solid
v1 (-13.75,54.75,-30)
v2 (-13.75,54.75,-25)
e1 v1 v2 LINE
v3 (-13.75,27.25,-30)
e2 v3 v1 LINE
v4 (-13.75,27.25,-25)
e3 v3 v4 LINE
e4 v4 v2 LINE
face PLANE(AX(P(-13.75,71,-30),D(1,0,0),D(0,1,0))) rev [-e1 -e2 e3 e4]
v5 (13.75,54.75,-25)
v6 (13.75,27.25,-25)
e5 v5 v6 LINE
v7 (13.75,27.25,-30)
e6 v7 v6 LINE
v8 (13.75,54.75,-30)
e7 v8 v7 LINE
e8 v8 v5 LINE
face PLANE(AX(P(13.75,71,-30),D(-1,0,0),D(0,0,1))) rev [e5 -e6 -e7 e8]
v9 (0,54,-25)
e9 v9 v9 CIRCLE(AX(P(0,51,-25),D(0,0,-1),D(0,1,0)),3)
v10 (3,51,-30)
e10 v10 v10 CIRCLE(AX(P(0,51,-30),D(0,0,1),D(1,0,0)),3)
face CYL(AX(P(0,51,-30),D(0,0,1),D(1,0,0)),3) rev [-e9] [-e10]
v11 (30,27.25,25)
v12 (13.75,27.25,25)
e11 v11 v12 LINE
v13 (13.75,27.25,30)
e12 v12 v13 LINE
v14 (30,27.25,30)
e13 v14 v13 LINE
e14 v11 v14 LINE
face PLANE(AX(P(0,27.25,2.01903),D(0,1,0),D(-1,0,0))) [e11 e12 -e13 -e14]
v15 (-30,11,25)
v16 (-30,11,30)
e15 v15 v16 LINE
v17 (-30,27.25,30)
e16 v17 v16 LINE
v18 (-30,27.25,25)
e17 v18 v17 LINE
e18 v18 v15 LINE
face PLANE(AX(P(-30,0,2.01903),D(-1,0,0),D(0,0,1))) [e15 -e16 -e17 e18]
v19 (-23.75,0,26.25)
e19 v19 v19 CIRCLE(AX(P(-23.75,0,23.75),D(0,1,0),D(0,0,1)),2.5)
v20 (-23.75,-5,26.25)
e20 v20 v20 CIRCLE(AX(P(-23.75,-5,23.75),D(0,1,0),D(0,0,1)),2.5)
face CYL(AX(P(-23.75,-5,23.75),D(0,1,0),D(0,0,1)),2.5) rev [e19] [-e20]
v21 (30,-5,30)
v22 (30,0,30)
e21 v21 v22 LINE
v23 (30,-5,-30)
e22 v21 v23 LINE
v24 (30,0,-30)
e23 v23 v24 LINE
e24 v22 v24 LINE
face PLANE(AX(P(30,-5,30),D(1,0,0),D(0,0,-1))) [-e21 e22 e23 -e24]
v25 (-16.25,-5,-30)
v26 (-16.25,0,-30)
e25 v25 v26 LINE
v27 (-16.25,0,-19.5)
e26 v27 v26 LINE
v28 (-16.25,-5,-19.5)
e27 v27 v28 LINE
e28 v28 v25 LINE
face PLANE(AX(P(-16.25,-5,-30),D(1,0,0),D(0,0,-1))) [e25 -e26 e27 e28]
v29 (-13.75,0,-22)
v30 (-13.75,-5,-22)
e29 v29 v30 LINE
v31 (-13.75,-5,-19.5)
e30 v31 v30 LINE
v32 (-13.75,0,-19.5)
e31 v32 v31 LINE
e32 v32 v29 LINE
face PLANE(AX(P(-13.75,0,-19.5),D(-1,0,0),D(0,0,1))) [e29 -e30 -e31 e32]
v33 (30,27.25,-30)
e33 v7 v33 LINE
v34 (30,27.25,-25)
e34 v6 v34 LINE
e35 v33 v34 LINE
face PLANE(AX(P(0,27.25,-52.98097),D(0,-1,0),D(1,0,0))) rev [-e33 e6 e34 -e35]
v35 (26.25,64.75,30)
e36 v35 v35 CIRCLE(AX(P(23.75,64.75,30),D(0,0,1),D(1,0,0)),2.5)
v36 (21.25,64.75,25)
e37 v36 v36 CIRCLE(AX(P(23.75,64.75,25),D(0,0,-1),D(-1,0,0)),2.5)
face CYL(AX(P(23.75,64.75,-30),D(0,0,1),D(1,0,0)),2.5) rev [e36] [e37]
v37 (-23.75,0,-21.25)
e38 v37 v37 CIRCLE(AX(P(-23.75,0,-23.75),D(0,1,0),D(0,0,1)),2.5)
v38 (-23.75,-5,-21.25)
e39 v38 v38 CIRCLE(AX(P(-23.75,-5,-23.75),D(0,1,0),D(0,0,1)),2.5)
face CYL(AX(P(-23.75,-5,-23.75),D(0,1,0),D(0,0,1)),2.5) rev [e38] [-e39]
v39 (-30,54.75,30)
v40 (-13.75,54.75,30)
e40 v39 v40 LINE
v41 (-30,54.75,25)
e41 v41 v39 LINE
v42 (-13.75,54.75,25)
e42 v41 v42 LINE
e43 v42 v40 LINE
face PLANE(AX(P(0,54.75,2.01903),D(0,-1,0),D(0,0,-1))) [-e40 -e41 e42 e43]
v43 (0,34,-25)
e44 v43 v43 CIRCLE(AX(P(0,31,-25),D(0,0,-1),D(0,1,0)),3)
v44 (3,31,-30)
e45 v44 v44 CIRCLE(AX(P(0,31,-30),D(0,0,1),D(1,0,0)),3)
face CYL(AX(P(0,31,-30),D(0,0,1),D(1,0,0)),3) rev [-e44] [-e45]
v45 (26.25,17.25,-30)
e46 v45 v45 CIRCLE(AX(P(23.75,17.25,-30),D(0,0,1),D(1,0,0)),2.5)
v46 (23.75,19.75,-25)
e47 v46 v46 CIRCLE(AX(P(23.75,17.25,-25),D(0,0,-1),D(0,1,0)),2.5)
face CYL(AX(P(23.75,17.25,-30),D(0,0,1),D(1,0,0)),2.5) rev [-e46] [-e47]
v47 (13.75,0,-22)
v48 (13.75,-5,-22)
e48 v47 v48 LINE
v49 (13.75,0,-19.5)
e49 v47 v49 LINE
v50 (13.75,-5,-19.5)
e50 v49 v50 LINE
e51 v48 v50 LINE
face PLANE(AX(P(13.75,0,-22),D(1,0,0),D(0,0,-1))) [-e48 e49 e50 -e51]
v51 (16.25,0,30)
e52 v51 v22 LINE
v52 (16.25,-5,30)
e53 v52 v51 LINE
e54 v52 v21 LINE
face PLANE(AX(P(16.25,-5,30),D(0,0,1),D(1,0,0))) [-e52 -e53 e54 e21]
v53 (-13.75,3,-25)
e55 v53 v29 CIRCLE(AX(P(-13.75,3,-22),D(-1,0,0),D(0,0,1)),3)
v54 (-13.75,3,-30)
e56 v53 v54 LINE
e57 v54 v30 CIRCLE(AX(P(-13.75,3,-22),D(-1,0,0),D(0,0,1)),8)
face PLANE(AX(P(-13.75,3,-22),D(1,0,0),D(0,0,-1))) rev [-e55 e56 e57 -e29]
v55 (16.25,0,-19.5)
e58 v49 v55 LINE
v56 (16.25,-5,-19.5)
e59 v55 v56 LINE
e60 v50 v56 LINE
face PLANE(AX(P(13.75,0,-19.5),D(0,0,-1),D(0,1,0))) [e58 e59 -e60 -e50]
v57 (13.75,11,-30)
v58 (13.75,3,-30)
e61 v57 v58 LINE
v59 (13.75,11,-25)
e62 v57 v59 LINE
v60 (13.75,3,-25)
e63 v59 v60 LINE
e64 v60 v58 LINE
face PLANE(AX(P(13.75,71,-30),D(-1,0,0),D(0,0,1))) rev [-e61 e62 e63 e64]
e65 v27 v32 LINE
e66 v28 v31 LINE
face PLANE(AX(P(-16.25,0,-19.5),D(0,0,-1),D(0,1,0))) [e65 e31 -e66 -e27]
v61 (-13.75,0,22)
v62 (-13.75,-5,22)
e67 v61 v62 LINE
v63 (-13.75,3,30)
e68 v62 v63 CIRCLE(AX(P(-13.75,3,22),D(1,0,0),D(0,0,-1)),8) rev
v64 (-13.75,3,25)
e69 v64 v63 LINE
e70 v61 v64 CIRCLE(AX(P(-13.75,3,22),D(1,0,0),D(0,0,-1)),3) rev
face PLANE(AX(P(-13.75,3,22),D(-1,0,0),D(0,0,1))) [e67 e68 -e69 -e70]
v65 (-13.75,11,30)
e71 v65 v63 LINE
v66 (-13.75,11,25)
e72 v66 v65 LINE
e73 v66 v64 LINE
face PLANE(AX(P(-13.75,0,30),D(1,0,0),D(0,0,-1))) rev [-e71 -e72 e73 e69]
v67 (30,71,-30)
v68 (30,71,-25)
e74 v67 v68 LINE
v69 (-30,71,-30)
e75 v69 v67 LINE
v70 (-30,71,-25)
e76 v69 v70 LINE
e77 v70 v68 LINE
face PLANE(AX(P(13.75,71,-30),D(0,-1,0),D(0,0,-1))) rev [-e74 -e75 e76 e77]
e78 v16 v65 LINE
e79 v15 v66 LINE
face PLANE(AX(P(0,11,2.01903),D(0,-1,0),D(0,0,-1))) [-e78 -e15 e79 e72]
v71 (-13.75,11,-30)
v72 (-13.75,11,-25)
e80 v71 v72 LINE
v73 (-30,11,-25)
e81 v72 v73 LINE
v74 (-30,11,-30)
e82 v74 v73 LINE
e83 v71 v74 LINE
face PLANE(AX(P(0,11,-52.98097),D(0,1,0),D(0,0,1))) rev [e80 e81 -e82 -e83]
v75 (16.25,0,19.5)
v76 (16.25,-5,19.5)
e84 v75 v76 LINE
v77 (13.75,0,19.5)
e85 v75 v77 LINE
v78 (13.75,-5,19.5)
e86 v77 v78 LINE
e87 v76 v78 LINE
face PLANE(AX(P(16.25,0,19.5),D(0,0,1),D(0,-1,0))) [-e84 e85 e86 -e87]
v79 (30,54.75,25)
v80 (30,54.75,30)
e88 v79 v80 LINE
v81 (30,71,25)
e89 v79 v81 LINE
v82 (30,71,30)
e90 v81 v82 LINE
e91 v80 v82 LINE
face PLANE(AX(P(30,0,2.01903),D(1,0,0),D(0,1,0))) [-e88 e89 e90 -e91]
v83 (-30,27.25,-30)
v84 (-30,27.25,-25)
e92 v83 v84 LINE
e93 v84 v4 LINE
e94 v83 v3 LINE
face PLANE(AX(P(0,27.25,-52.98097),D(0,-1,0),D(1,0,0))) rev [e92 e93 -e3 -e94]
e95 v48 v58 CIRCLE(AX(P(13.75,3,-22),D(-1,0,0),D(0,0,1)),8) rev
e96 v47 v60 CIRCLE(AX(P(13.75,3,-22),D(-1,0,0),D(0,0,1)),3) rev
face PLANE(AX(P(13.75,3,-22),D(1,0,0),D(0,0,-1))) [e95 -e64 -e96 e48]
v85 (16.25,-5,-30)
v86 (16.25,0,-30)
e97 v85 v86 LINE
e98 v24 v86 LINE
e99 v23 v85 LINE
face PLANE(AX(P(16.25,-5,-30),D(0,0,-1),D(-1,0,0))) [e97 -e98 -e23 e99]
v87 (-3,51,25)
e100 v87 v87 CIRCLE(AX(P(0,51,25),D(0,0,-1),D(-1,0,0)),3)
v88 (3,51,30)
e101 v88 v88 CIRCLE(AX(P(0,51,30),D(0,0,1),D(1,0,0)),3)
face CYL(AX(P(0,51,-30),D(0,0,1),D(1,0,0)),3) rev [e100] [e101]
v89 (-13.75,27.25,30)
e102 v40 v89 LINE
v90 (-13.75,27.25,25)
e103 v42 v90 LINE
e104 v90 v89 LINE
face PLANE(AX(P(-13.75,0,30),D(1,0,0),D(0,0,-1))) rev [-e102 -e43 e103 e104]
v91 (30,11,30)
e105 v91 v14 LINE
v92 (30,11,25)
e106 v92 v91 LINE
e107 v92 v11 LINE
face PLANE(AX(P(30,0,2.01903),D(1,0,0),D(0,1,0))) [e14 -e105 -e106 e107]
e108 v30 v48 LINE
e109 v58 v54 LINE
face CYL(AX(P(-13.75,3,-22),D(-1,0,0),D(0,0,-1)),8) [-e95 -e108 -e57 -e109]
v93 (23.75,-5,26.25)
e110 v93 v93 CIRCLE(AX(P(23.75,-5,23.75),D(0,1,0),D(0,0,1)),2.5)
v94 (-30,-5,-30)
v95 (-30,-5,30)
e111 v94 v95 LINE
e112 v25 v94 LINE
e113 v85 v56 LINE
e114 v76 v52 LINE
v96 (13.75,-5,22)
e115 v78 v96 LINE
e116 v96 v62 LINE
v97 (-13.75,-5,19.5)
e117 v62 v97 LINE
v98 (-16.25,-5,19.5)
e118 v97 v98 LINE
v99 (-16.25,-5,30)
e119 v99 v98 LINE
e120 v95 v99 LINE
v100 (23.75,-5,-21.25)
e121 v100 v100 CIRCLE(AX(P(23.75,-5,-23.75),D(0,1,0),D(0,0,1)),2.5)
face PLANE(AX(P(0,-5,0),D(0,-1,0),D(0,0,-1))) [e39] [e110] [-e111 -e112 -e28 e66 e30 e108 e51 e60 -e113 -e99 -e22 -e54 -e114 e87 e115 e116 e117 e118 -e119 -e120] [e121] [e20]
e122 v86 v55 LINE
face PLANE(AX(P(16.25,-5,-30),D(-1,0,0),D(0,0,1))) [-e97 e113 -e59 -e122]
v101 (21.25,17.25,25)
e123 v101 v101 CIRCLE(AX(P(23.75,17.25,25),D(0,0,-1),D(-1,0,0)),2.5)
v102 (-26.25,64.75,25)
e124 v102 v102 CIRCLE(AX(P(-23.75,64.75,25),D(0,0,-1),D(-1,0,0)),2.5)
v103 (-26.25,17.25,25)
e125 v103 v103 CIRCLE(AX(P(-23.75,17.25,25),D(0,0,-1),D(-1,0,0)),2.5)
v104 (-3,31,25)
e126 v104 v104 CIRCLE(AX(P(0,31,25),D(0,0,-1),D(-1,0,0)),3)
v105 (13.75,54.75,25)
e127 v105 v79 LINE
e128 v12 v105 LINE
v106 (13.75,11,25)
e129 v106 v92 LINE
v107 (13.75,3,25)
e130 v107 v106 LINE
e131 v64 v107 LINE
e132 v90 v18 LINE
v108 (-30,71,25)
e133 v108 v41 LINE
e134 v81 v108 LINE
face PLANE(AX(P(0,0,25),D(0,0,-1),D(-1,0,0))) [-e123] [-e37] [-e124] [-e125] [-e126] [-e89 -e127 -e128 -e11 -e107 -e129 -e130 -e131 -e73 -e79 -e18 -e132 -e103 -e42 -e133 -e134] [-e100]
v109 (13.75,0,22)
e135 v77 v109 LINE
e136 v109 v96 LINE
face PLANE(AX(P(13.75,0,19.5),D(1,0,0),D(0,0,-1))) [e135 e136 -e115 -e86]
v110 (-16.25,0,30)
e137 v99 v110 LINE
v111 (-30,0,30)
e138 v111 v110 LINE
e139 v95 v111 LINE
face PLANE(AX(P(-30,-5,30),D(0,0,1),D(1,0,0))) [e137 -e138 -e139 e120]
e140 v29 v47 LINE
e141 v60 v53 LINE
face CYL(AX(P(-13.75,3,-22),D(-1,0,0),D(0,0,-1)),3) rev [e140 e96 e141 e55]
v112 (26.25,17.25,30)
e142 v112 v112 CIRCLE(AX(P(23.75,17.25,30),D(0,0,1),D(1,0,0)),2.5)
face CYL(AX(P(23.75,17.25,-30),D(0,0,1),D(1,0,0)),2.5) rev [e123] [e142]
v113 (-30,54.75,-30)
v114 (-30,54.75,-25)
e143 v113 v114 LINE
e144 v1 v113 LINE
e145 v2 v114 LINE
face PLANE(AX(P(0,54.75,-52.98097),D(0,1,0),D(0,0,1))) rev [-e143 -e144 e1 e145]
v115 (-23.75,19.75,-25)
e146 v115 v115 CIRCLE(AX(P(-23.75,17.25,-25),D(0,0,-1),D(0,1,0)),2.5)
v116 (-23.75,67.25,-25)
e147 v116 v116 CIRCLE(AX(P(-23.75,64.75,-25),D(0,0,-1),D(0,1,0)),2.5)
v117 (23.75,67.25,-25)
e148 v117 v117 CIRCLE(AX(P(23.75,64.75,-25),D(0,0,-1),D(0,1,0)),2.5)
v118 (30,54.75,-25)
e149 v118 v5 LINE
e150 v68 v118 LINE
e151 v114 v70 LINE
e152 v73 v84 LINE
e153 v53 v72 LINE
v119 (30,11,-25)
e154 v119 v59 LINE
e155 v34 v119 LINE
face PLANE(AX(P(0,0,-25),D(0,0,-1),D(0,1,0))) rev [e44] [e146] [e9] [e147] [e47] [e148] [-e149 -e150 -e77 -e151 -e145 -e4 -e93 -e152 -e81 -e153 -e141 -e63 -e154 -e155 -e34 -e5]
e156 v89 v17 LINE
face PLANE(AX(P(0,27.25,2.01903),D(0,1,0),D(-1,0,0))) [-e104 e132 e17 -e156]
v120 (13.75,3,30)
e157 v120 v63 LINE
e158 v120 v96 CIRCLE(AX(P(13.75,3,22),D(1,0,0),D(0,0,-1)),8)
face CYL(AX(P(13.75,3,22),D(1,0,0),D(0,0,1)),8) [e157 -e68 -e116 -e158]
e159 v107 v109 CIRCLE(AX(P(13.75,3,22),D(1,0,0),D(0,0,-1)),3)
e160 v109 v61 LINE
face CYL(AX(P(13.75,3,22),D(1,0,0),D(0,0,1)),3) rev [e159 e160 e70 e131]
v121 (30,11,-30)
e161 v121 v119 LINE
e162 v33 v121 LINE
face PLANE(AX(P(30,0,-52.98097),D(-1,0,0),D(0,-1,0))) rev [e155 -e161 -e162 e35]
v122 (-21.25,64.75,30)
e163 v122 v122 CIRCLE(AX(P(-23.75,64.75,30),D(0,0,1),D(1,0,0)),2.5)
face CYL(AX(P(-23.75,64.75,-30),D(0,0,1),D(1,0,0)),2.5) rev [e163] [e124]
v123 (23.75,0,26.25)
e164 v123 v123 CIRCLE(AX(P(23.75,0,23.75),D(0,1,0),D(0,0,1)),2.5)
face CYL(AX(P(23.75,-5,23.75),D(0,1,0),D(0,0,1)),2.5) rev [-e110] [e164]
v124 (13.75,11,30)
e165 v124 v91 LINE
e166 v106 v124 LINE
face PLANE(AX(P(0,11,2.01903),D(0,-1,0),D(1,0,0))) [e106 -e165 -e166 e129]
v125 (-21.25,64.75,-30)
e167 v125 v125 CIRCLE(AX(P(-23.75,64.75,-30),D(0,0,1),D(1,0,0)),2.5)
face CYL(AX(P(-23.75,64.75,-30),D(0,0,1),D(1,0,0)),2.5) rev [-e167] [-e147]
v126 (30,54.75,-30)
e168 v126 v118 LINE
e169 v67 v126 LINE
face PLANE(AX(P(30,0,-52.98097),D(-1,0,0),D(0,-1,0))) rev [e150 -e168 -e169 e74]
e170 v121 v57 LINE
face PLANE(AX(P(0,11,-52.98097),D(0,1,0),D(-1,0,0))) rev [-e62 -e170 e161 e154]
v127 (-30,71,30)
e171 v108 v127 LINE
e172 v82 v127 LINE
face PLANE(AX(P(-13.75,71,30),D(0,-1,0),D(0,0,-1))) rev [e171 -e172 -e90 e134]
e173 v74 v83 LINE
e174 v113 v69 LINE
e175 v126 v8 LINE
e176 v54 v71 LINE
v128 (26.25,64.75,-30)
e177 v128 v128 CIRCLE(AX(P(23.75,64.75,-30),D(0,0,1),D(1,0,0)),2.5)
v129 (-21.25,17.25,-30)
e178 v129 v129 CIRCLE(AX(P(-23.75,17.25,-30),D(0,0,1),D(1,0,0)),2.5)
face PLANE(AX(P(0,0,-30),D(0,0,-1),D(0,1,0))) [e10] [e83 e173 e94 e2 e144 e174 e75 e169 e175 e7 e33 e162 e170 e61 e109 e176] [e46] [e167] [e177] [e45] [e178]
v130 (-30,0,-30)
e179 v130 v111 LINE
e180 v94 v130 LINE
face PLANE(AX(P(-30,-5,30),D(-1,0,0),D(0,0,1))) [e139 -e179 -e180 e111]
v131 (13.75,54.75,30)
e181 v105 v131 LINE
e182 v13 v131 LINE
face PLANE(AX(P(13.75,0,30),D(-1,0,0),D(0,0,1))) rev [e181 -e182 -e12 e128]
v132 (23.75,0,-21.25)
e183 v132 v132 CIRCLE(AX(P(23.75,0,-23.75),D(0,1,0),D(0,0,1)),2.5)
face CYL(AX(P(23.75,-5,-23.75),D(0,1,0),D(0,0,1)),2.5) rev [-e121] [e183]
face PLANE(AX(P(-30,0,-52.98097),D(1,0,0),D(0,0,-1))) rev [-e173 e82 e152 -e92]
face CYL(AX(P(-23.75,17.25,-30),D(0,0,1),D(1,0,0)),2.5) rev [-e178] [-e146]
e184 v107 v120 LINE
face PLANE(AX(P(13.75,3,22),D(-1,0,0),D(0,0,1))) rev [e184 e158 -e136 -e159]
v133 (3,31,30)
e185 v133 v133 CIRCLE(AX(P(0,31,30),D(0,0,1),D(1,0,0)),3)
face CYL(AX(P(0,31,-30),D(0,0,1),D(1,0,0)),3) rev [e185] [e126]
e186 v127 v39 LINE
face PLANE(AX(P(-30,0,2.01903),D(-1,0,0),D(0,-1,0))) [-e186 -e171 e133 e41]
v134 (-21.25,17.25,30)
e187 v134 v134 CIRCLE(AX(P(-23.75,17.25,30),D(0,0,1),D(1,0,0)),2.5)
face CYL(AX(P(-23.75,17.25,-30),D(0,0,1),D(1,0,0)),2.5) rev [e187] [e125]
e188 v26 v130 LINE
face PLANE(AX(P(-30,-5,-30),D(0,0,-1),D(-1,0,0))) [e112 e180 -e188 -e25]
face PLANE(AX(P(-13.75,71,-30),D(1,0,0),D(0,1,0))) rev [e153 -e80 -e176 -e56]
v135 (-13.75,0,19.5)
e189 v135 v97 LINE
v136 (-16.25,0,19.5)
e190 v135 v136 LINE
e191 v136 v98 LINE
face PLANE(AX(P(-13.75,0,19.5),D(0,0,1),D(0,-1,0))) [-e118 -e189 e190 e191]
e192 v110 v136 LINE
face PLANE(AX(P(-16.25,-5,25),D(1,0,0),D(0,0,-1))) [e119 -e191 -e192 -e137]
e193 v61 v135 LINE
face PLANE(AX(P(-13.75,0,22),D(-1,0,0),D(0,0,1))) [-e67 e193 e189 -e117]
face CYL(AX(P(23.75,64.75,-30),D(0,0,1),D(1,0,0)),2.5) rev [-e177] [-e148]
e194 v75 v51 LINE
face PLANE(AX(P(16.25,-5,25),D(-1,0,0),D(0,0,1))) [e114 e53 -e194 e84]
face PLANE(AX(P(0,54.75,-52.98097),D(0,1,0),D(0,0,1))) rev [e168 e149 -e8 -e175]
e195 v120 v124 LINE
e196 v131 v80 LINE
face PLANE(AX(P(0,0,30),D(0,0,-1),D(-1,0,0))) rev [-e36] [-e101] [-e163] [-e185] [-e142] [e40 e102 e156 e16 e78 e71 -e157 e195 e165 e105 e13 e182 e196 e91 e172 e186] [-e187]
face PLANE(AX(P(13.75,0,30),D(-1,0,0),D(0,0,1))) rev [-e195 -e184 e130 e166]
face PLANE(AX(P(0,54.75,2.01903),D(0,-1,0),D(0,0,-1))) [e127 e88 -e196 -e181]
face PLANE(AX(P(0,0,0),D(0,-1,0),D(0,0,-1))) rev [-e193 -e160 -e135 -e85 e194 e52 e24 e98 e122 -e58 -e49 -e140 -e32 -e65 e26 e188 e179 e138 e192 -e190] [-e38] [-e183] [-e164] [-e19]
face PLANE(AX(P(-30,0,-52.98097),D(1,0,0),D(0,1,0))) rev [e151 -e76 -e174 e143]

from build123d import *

# Parameters (mm, degrees)
SKETCH_16_R                       = 2.5
SM_BASE_FLANGE_2_DEPTH            = 5
SM_EDGE_FLANGE_1_STRIP_W          = 26
SM_EDGE_FLANGE_1_STRIP_H          = 5
SM_EDGE_FLANGE_1_STRIP_CUT_DEPTH  = 27.5
SM_EDGE_FLANGE_1_RELIEF_W         = 28.5
SM_EDGE_FLANGE_1_RELIEF_H         = 2.5
SM_EDGE_FLANGE_1_RELIEF_CUT_DEPTH = 5
SM_EDGE_FLANGE_1_DEPTH            = 27.5
SM_EDGE_FLANGE_2_STRIP_W          = 26
SM_EDGE_FLANGE_2_STRIP_H          = 5
SM_EDGE_FLANGE_2_STRIP_CUT_DEPTH  = 27.5
SM_EDGE_FLANGE_2_RELIEF_W         = 28.5
SM_EDGE_FLANGE_2_RELIEF_H         = 2.5
SM_EDGE_FLANGE_2_RELIEF_CUT_DEPTH = 5
SM_EDGE_FLANGE_2_DEPTH            = 27.5
EXTRUDE_START                     = 30
SKETCH_23_W                       = 16.25
SKETCH_23_H                       = 16.25
EXTRUDE_1_DEPTH                   = 5
EXTRUDE_START_2                   = -25
SKETCH_24_W                       = 16.25
SKETCH_24_H                       = 16.25
EXTRUDE_2_DEPTH                   = 5
CUT_EXTRUDE_1_DEPTH               = 83.710337927
CUT_EXTRUDE_1_DEPTH_BACK          = 83.710337927
SKETCH_25_R                       = 2.5
CUT_EXTRUDE_2_DEPTH               = 83.710337927
CUT_EXTRUDE_2_DEPTH_BACK          = 83.710337927
SKETCH_26_R                       = 3


# Sheet-metal steps are written as plain solids
with BuildPart() as part:
    # 草图16 → 基体-法兰2 (new body)
    with BuildSketch(Plane(origin=(0, 0, 0), x_dir=(1, 0, 0), z_dir=(0, 1, 0))):
        Polygon((16.25, 30), (30, 30), (30, -30), (16.25, -30), (16.25, -25), (-16.25, -25), (-16.25, -30), (-30, -30), (-30, 30), (-16.25, 30), (-16.25, 25), (16.25, 25), align=None)
        with Locations(Location((-23.75, 23.75, 0), (0, 0, 270))):
            Circle(SKETCH_16_R, mode=Mode.SUBTRACT)
        with Locations(Location((-23.75, -23.75, 0), (0, 0, 270))):
            Circle(SKETCH_16_R, mode=Mode.SUBTRACT)
        with Locations(Location((23.75, 23.75, 0), (0, 0, 270))):
            Circle(SKETCH_16_R, mode=Mode.SUBTRACT)
        with Locations(Location((23.75, -23.75, 0), (0, 0, 270))):
            Circle(SKETCH_16_R, mode=Mode.SUBTRACT)
    extrude(amount=-SM_BASE_FLANGE_2_DEPTH)

    # 边线-法兰1 strip (across the edge) → 边线-法兰1 strip cut (cut)
    with BuildSketch(Plane(origin=(-13.75, 0, 25), x_dir=(0, 0, -1), z_dir=(1, 0, 0))):
        with Locations((-10, -2.5)):
            Rectangle(SM_EDGE_FLANGE_1_STRIP_W, SM_EDGE_FLANGE_1_STRIP_H)
    extrude(amount=SM_EDGE_FLANGE_1_STRIP_CUT_DEPTH, mode=Mode.SUBTRACT)

    # 边线-法兰1 relief (on the sheet) → 边线-法兰1 relief cut (cut)
    with BuildSketch(Plane(origin=(-13.75, 0, 22), x_dir=(0, 0, -1), z_dir=(0, 1, 0))):
        with Locations((-11.75, 1.25)):
            Rectangle(SM_EDGE_FLANGE_1_RELIEF_W, SM_EDGE_FLANGE_1_RELIEF_H)
        with Locations((-11.75, -28.75)):
            Rectangle(SM_EDGE_FLANGE_1_RELIEF_W, SM_EDGE_FLANGE_1_RELIEF_H)
    extrude(amount=-SM_EDGE_FLANGE_1_RELIEF_CUT_DEPTH, mode=Mode.SUBTRACT)

    # 边线-法兰1 section (across the edge) → 边线-法兰1 (add)
    with BuildSketch(Plane(origin=(-13.75, 0, 25), x_dir=(0, 0, -1), z_dir=(1, 0, 0))):
        with BuildLine():
            Line((-5, 3), (-5, 71))
            Line((-5, 71), (0, 71))
            Line((0, 71), (0, 3))
            ThreePointArc((0, 3), (0.878679656, 0.878679656), (3, 0))
            Line((3, 0), (3, -5))
            ThreePointArc((3, -5), (-2.656854249, -2.656854249), (-5, 3))
        make_face()
    extrude(amount=SM_EDGE_FLANGE_1_DEPTH)

    # 边线-法兰2 strip (across the edge) → 边线-法兰2 strip cut (cut)
    with BuildSketch(Plane(origin=(13.75, 0, -25), x_dir=(0, 0, 1), z_dir=(-1, 0, 0))):
        with Locations((-10, -2.5)):
            Rectangle(SM_EDGE_FLANGE_2_STRIP_W, SM_EDGE_FLANGE_2_STRIP_H)
    extrude(amount=SM_EDGE_FLANGE_2_STRIP_CUT_DEPTH, mode=Mode.SUBTRACT)

    # 边线-法兰2 relief (on the sheet) → 边线-法兰2 relief cut (cut)
    with BuildSketch(Plane(origin=(13.75, 0, -22), x_dir=(0, 0, 1), z_dir=(0, 1, 0))):
        with Locations((-11.75, 1.25)):
            Rectangle(SM_EDGE_FLANGE_2_RELIEF_W, SM_EDGE_FLANGE_2_RELIEF_H)
        with Locations((-11.75, -28.75)):
            Rectangle(SM_EDGE_FLANGE_2_RELIEF_W, SM_EDGE_FLANGE_2_RELIEF_H)
    extrude(amount=-SM_EDGE_FLANGE_2_RELIEF_CUT_DEPTH, mode=Mode.SUBTRACT)

    # 边线-法兰2 section (across the edge) → 边线-法兰2 (add)
    with BuildSketch(Plane(origin=(13.75, 0, -25), x_dir=(0, 0, 1), z_dir=(-1, 0, 0))):
        with BuildLine():
            Line((-5, 3), (-5, 71))
            Line((-5, 71), (0, 71))
            Line((0, 71), (0, 3))
            ThreePointArc((0, 3), (0.878679656, 0.878679656), (3, 0))
            Line((3, 0), (3, -5))
            ThreePointArc((3, -5), (-2.656854249, -2.656854249), (-5, 3))
        make_face()
    extrude(amount=SM_EDGE_FLANGE_2_DEPTH)

    # 草图23 → 凸台-拉伸1 (add)
    with BuildSketch(Plane.XY.offset(EXTRUDE_START)):
        with Locations((-21.875, 62.875)):
            Rectangle(SKETCH_23_W, SKETCH_23_H)
        with Locations((21.875, 62.875)):
            Rectangle(SKETCH_23_W, SKETCH_23_H)
        with Locations((21.875, 19.125)):
            Rectangle(SKETCH_23_W, SKETCH_23_H)
        with Locations((-21.875, 19.125)):
            Rectangle(SKETCH_23_W, SKETCH_23_H)
    extrude(amount=-EXTRUDE_1_DEPTH)

    # 草图24 → 凸台-拉伸2 (add)
    with BuildSketch(Plane.XY.offset(EXTRUDE_START_2)):
        with Locations((21.875, 62.875)):
            Rectangle(SKETCH_24_W, SKETCH_24_H)
        with Locations((-21.875, 62.875)):
            Rectangle(SKETCH_24_W, SKETCH_24_H)
        with Locations((-21.875, 19.125)):
            Rectangle(SKETCH_24_W, SKETCH_24_H)
        with Locations((21.875, 19.125)):
            Rectangle(SKETCH_24_W, SKETCH_24_H)
    extrude(amount=-EXTRUDE_2_DEPTH)

    # 草图25 → 切除-拉伸1 (cut, two sides: drawn at the far end of the back side and taken through both)
    with BuildSketch(Plane.XY.offset(-CUT_EXTRUDE_1_DEPTH_BACK)):
        with Locations((-23.75, 64.75)):
            Circle(SKETCH_25_R)
        with Locations((23.75, 64.75)):
            Circle(SKETCH_25_R)
        with Locations((-23.75, 17.25)):
            Circle(SKETCH_25_R)
        with Locations((23.75, 17.25)):
            Circle(SKETCH_25_R)
    extrude(amount=CUT_EXTRUDE_1_DEPTH + CUT_EXTRUDE_1_DEPTH_BACK, mode=Mode.SUBTRACT)

    # 草图26 → 切除-拉伸2 (cut, two sides: drawn at the far end of the back side and taken through both)
    with BuildSketch(Plane.XY.offset(-CUT_EXTRUDE_2_DEPTH_BACK)):
        with Locations((0, 51)):
            Circle(SKETCH_26_R)
        with Locations((0, 31)):
            Circle(SKETCH_26_R)
    extrude(amount=CUT_EXTRUDE_2_DEPTH + CUT_EXTRUDE_2_DEPTH_BACK, mode=Mode.SUBTRACT)


solid = part.part
